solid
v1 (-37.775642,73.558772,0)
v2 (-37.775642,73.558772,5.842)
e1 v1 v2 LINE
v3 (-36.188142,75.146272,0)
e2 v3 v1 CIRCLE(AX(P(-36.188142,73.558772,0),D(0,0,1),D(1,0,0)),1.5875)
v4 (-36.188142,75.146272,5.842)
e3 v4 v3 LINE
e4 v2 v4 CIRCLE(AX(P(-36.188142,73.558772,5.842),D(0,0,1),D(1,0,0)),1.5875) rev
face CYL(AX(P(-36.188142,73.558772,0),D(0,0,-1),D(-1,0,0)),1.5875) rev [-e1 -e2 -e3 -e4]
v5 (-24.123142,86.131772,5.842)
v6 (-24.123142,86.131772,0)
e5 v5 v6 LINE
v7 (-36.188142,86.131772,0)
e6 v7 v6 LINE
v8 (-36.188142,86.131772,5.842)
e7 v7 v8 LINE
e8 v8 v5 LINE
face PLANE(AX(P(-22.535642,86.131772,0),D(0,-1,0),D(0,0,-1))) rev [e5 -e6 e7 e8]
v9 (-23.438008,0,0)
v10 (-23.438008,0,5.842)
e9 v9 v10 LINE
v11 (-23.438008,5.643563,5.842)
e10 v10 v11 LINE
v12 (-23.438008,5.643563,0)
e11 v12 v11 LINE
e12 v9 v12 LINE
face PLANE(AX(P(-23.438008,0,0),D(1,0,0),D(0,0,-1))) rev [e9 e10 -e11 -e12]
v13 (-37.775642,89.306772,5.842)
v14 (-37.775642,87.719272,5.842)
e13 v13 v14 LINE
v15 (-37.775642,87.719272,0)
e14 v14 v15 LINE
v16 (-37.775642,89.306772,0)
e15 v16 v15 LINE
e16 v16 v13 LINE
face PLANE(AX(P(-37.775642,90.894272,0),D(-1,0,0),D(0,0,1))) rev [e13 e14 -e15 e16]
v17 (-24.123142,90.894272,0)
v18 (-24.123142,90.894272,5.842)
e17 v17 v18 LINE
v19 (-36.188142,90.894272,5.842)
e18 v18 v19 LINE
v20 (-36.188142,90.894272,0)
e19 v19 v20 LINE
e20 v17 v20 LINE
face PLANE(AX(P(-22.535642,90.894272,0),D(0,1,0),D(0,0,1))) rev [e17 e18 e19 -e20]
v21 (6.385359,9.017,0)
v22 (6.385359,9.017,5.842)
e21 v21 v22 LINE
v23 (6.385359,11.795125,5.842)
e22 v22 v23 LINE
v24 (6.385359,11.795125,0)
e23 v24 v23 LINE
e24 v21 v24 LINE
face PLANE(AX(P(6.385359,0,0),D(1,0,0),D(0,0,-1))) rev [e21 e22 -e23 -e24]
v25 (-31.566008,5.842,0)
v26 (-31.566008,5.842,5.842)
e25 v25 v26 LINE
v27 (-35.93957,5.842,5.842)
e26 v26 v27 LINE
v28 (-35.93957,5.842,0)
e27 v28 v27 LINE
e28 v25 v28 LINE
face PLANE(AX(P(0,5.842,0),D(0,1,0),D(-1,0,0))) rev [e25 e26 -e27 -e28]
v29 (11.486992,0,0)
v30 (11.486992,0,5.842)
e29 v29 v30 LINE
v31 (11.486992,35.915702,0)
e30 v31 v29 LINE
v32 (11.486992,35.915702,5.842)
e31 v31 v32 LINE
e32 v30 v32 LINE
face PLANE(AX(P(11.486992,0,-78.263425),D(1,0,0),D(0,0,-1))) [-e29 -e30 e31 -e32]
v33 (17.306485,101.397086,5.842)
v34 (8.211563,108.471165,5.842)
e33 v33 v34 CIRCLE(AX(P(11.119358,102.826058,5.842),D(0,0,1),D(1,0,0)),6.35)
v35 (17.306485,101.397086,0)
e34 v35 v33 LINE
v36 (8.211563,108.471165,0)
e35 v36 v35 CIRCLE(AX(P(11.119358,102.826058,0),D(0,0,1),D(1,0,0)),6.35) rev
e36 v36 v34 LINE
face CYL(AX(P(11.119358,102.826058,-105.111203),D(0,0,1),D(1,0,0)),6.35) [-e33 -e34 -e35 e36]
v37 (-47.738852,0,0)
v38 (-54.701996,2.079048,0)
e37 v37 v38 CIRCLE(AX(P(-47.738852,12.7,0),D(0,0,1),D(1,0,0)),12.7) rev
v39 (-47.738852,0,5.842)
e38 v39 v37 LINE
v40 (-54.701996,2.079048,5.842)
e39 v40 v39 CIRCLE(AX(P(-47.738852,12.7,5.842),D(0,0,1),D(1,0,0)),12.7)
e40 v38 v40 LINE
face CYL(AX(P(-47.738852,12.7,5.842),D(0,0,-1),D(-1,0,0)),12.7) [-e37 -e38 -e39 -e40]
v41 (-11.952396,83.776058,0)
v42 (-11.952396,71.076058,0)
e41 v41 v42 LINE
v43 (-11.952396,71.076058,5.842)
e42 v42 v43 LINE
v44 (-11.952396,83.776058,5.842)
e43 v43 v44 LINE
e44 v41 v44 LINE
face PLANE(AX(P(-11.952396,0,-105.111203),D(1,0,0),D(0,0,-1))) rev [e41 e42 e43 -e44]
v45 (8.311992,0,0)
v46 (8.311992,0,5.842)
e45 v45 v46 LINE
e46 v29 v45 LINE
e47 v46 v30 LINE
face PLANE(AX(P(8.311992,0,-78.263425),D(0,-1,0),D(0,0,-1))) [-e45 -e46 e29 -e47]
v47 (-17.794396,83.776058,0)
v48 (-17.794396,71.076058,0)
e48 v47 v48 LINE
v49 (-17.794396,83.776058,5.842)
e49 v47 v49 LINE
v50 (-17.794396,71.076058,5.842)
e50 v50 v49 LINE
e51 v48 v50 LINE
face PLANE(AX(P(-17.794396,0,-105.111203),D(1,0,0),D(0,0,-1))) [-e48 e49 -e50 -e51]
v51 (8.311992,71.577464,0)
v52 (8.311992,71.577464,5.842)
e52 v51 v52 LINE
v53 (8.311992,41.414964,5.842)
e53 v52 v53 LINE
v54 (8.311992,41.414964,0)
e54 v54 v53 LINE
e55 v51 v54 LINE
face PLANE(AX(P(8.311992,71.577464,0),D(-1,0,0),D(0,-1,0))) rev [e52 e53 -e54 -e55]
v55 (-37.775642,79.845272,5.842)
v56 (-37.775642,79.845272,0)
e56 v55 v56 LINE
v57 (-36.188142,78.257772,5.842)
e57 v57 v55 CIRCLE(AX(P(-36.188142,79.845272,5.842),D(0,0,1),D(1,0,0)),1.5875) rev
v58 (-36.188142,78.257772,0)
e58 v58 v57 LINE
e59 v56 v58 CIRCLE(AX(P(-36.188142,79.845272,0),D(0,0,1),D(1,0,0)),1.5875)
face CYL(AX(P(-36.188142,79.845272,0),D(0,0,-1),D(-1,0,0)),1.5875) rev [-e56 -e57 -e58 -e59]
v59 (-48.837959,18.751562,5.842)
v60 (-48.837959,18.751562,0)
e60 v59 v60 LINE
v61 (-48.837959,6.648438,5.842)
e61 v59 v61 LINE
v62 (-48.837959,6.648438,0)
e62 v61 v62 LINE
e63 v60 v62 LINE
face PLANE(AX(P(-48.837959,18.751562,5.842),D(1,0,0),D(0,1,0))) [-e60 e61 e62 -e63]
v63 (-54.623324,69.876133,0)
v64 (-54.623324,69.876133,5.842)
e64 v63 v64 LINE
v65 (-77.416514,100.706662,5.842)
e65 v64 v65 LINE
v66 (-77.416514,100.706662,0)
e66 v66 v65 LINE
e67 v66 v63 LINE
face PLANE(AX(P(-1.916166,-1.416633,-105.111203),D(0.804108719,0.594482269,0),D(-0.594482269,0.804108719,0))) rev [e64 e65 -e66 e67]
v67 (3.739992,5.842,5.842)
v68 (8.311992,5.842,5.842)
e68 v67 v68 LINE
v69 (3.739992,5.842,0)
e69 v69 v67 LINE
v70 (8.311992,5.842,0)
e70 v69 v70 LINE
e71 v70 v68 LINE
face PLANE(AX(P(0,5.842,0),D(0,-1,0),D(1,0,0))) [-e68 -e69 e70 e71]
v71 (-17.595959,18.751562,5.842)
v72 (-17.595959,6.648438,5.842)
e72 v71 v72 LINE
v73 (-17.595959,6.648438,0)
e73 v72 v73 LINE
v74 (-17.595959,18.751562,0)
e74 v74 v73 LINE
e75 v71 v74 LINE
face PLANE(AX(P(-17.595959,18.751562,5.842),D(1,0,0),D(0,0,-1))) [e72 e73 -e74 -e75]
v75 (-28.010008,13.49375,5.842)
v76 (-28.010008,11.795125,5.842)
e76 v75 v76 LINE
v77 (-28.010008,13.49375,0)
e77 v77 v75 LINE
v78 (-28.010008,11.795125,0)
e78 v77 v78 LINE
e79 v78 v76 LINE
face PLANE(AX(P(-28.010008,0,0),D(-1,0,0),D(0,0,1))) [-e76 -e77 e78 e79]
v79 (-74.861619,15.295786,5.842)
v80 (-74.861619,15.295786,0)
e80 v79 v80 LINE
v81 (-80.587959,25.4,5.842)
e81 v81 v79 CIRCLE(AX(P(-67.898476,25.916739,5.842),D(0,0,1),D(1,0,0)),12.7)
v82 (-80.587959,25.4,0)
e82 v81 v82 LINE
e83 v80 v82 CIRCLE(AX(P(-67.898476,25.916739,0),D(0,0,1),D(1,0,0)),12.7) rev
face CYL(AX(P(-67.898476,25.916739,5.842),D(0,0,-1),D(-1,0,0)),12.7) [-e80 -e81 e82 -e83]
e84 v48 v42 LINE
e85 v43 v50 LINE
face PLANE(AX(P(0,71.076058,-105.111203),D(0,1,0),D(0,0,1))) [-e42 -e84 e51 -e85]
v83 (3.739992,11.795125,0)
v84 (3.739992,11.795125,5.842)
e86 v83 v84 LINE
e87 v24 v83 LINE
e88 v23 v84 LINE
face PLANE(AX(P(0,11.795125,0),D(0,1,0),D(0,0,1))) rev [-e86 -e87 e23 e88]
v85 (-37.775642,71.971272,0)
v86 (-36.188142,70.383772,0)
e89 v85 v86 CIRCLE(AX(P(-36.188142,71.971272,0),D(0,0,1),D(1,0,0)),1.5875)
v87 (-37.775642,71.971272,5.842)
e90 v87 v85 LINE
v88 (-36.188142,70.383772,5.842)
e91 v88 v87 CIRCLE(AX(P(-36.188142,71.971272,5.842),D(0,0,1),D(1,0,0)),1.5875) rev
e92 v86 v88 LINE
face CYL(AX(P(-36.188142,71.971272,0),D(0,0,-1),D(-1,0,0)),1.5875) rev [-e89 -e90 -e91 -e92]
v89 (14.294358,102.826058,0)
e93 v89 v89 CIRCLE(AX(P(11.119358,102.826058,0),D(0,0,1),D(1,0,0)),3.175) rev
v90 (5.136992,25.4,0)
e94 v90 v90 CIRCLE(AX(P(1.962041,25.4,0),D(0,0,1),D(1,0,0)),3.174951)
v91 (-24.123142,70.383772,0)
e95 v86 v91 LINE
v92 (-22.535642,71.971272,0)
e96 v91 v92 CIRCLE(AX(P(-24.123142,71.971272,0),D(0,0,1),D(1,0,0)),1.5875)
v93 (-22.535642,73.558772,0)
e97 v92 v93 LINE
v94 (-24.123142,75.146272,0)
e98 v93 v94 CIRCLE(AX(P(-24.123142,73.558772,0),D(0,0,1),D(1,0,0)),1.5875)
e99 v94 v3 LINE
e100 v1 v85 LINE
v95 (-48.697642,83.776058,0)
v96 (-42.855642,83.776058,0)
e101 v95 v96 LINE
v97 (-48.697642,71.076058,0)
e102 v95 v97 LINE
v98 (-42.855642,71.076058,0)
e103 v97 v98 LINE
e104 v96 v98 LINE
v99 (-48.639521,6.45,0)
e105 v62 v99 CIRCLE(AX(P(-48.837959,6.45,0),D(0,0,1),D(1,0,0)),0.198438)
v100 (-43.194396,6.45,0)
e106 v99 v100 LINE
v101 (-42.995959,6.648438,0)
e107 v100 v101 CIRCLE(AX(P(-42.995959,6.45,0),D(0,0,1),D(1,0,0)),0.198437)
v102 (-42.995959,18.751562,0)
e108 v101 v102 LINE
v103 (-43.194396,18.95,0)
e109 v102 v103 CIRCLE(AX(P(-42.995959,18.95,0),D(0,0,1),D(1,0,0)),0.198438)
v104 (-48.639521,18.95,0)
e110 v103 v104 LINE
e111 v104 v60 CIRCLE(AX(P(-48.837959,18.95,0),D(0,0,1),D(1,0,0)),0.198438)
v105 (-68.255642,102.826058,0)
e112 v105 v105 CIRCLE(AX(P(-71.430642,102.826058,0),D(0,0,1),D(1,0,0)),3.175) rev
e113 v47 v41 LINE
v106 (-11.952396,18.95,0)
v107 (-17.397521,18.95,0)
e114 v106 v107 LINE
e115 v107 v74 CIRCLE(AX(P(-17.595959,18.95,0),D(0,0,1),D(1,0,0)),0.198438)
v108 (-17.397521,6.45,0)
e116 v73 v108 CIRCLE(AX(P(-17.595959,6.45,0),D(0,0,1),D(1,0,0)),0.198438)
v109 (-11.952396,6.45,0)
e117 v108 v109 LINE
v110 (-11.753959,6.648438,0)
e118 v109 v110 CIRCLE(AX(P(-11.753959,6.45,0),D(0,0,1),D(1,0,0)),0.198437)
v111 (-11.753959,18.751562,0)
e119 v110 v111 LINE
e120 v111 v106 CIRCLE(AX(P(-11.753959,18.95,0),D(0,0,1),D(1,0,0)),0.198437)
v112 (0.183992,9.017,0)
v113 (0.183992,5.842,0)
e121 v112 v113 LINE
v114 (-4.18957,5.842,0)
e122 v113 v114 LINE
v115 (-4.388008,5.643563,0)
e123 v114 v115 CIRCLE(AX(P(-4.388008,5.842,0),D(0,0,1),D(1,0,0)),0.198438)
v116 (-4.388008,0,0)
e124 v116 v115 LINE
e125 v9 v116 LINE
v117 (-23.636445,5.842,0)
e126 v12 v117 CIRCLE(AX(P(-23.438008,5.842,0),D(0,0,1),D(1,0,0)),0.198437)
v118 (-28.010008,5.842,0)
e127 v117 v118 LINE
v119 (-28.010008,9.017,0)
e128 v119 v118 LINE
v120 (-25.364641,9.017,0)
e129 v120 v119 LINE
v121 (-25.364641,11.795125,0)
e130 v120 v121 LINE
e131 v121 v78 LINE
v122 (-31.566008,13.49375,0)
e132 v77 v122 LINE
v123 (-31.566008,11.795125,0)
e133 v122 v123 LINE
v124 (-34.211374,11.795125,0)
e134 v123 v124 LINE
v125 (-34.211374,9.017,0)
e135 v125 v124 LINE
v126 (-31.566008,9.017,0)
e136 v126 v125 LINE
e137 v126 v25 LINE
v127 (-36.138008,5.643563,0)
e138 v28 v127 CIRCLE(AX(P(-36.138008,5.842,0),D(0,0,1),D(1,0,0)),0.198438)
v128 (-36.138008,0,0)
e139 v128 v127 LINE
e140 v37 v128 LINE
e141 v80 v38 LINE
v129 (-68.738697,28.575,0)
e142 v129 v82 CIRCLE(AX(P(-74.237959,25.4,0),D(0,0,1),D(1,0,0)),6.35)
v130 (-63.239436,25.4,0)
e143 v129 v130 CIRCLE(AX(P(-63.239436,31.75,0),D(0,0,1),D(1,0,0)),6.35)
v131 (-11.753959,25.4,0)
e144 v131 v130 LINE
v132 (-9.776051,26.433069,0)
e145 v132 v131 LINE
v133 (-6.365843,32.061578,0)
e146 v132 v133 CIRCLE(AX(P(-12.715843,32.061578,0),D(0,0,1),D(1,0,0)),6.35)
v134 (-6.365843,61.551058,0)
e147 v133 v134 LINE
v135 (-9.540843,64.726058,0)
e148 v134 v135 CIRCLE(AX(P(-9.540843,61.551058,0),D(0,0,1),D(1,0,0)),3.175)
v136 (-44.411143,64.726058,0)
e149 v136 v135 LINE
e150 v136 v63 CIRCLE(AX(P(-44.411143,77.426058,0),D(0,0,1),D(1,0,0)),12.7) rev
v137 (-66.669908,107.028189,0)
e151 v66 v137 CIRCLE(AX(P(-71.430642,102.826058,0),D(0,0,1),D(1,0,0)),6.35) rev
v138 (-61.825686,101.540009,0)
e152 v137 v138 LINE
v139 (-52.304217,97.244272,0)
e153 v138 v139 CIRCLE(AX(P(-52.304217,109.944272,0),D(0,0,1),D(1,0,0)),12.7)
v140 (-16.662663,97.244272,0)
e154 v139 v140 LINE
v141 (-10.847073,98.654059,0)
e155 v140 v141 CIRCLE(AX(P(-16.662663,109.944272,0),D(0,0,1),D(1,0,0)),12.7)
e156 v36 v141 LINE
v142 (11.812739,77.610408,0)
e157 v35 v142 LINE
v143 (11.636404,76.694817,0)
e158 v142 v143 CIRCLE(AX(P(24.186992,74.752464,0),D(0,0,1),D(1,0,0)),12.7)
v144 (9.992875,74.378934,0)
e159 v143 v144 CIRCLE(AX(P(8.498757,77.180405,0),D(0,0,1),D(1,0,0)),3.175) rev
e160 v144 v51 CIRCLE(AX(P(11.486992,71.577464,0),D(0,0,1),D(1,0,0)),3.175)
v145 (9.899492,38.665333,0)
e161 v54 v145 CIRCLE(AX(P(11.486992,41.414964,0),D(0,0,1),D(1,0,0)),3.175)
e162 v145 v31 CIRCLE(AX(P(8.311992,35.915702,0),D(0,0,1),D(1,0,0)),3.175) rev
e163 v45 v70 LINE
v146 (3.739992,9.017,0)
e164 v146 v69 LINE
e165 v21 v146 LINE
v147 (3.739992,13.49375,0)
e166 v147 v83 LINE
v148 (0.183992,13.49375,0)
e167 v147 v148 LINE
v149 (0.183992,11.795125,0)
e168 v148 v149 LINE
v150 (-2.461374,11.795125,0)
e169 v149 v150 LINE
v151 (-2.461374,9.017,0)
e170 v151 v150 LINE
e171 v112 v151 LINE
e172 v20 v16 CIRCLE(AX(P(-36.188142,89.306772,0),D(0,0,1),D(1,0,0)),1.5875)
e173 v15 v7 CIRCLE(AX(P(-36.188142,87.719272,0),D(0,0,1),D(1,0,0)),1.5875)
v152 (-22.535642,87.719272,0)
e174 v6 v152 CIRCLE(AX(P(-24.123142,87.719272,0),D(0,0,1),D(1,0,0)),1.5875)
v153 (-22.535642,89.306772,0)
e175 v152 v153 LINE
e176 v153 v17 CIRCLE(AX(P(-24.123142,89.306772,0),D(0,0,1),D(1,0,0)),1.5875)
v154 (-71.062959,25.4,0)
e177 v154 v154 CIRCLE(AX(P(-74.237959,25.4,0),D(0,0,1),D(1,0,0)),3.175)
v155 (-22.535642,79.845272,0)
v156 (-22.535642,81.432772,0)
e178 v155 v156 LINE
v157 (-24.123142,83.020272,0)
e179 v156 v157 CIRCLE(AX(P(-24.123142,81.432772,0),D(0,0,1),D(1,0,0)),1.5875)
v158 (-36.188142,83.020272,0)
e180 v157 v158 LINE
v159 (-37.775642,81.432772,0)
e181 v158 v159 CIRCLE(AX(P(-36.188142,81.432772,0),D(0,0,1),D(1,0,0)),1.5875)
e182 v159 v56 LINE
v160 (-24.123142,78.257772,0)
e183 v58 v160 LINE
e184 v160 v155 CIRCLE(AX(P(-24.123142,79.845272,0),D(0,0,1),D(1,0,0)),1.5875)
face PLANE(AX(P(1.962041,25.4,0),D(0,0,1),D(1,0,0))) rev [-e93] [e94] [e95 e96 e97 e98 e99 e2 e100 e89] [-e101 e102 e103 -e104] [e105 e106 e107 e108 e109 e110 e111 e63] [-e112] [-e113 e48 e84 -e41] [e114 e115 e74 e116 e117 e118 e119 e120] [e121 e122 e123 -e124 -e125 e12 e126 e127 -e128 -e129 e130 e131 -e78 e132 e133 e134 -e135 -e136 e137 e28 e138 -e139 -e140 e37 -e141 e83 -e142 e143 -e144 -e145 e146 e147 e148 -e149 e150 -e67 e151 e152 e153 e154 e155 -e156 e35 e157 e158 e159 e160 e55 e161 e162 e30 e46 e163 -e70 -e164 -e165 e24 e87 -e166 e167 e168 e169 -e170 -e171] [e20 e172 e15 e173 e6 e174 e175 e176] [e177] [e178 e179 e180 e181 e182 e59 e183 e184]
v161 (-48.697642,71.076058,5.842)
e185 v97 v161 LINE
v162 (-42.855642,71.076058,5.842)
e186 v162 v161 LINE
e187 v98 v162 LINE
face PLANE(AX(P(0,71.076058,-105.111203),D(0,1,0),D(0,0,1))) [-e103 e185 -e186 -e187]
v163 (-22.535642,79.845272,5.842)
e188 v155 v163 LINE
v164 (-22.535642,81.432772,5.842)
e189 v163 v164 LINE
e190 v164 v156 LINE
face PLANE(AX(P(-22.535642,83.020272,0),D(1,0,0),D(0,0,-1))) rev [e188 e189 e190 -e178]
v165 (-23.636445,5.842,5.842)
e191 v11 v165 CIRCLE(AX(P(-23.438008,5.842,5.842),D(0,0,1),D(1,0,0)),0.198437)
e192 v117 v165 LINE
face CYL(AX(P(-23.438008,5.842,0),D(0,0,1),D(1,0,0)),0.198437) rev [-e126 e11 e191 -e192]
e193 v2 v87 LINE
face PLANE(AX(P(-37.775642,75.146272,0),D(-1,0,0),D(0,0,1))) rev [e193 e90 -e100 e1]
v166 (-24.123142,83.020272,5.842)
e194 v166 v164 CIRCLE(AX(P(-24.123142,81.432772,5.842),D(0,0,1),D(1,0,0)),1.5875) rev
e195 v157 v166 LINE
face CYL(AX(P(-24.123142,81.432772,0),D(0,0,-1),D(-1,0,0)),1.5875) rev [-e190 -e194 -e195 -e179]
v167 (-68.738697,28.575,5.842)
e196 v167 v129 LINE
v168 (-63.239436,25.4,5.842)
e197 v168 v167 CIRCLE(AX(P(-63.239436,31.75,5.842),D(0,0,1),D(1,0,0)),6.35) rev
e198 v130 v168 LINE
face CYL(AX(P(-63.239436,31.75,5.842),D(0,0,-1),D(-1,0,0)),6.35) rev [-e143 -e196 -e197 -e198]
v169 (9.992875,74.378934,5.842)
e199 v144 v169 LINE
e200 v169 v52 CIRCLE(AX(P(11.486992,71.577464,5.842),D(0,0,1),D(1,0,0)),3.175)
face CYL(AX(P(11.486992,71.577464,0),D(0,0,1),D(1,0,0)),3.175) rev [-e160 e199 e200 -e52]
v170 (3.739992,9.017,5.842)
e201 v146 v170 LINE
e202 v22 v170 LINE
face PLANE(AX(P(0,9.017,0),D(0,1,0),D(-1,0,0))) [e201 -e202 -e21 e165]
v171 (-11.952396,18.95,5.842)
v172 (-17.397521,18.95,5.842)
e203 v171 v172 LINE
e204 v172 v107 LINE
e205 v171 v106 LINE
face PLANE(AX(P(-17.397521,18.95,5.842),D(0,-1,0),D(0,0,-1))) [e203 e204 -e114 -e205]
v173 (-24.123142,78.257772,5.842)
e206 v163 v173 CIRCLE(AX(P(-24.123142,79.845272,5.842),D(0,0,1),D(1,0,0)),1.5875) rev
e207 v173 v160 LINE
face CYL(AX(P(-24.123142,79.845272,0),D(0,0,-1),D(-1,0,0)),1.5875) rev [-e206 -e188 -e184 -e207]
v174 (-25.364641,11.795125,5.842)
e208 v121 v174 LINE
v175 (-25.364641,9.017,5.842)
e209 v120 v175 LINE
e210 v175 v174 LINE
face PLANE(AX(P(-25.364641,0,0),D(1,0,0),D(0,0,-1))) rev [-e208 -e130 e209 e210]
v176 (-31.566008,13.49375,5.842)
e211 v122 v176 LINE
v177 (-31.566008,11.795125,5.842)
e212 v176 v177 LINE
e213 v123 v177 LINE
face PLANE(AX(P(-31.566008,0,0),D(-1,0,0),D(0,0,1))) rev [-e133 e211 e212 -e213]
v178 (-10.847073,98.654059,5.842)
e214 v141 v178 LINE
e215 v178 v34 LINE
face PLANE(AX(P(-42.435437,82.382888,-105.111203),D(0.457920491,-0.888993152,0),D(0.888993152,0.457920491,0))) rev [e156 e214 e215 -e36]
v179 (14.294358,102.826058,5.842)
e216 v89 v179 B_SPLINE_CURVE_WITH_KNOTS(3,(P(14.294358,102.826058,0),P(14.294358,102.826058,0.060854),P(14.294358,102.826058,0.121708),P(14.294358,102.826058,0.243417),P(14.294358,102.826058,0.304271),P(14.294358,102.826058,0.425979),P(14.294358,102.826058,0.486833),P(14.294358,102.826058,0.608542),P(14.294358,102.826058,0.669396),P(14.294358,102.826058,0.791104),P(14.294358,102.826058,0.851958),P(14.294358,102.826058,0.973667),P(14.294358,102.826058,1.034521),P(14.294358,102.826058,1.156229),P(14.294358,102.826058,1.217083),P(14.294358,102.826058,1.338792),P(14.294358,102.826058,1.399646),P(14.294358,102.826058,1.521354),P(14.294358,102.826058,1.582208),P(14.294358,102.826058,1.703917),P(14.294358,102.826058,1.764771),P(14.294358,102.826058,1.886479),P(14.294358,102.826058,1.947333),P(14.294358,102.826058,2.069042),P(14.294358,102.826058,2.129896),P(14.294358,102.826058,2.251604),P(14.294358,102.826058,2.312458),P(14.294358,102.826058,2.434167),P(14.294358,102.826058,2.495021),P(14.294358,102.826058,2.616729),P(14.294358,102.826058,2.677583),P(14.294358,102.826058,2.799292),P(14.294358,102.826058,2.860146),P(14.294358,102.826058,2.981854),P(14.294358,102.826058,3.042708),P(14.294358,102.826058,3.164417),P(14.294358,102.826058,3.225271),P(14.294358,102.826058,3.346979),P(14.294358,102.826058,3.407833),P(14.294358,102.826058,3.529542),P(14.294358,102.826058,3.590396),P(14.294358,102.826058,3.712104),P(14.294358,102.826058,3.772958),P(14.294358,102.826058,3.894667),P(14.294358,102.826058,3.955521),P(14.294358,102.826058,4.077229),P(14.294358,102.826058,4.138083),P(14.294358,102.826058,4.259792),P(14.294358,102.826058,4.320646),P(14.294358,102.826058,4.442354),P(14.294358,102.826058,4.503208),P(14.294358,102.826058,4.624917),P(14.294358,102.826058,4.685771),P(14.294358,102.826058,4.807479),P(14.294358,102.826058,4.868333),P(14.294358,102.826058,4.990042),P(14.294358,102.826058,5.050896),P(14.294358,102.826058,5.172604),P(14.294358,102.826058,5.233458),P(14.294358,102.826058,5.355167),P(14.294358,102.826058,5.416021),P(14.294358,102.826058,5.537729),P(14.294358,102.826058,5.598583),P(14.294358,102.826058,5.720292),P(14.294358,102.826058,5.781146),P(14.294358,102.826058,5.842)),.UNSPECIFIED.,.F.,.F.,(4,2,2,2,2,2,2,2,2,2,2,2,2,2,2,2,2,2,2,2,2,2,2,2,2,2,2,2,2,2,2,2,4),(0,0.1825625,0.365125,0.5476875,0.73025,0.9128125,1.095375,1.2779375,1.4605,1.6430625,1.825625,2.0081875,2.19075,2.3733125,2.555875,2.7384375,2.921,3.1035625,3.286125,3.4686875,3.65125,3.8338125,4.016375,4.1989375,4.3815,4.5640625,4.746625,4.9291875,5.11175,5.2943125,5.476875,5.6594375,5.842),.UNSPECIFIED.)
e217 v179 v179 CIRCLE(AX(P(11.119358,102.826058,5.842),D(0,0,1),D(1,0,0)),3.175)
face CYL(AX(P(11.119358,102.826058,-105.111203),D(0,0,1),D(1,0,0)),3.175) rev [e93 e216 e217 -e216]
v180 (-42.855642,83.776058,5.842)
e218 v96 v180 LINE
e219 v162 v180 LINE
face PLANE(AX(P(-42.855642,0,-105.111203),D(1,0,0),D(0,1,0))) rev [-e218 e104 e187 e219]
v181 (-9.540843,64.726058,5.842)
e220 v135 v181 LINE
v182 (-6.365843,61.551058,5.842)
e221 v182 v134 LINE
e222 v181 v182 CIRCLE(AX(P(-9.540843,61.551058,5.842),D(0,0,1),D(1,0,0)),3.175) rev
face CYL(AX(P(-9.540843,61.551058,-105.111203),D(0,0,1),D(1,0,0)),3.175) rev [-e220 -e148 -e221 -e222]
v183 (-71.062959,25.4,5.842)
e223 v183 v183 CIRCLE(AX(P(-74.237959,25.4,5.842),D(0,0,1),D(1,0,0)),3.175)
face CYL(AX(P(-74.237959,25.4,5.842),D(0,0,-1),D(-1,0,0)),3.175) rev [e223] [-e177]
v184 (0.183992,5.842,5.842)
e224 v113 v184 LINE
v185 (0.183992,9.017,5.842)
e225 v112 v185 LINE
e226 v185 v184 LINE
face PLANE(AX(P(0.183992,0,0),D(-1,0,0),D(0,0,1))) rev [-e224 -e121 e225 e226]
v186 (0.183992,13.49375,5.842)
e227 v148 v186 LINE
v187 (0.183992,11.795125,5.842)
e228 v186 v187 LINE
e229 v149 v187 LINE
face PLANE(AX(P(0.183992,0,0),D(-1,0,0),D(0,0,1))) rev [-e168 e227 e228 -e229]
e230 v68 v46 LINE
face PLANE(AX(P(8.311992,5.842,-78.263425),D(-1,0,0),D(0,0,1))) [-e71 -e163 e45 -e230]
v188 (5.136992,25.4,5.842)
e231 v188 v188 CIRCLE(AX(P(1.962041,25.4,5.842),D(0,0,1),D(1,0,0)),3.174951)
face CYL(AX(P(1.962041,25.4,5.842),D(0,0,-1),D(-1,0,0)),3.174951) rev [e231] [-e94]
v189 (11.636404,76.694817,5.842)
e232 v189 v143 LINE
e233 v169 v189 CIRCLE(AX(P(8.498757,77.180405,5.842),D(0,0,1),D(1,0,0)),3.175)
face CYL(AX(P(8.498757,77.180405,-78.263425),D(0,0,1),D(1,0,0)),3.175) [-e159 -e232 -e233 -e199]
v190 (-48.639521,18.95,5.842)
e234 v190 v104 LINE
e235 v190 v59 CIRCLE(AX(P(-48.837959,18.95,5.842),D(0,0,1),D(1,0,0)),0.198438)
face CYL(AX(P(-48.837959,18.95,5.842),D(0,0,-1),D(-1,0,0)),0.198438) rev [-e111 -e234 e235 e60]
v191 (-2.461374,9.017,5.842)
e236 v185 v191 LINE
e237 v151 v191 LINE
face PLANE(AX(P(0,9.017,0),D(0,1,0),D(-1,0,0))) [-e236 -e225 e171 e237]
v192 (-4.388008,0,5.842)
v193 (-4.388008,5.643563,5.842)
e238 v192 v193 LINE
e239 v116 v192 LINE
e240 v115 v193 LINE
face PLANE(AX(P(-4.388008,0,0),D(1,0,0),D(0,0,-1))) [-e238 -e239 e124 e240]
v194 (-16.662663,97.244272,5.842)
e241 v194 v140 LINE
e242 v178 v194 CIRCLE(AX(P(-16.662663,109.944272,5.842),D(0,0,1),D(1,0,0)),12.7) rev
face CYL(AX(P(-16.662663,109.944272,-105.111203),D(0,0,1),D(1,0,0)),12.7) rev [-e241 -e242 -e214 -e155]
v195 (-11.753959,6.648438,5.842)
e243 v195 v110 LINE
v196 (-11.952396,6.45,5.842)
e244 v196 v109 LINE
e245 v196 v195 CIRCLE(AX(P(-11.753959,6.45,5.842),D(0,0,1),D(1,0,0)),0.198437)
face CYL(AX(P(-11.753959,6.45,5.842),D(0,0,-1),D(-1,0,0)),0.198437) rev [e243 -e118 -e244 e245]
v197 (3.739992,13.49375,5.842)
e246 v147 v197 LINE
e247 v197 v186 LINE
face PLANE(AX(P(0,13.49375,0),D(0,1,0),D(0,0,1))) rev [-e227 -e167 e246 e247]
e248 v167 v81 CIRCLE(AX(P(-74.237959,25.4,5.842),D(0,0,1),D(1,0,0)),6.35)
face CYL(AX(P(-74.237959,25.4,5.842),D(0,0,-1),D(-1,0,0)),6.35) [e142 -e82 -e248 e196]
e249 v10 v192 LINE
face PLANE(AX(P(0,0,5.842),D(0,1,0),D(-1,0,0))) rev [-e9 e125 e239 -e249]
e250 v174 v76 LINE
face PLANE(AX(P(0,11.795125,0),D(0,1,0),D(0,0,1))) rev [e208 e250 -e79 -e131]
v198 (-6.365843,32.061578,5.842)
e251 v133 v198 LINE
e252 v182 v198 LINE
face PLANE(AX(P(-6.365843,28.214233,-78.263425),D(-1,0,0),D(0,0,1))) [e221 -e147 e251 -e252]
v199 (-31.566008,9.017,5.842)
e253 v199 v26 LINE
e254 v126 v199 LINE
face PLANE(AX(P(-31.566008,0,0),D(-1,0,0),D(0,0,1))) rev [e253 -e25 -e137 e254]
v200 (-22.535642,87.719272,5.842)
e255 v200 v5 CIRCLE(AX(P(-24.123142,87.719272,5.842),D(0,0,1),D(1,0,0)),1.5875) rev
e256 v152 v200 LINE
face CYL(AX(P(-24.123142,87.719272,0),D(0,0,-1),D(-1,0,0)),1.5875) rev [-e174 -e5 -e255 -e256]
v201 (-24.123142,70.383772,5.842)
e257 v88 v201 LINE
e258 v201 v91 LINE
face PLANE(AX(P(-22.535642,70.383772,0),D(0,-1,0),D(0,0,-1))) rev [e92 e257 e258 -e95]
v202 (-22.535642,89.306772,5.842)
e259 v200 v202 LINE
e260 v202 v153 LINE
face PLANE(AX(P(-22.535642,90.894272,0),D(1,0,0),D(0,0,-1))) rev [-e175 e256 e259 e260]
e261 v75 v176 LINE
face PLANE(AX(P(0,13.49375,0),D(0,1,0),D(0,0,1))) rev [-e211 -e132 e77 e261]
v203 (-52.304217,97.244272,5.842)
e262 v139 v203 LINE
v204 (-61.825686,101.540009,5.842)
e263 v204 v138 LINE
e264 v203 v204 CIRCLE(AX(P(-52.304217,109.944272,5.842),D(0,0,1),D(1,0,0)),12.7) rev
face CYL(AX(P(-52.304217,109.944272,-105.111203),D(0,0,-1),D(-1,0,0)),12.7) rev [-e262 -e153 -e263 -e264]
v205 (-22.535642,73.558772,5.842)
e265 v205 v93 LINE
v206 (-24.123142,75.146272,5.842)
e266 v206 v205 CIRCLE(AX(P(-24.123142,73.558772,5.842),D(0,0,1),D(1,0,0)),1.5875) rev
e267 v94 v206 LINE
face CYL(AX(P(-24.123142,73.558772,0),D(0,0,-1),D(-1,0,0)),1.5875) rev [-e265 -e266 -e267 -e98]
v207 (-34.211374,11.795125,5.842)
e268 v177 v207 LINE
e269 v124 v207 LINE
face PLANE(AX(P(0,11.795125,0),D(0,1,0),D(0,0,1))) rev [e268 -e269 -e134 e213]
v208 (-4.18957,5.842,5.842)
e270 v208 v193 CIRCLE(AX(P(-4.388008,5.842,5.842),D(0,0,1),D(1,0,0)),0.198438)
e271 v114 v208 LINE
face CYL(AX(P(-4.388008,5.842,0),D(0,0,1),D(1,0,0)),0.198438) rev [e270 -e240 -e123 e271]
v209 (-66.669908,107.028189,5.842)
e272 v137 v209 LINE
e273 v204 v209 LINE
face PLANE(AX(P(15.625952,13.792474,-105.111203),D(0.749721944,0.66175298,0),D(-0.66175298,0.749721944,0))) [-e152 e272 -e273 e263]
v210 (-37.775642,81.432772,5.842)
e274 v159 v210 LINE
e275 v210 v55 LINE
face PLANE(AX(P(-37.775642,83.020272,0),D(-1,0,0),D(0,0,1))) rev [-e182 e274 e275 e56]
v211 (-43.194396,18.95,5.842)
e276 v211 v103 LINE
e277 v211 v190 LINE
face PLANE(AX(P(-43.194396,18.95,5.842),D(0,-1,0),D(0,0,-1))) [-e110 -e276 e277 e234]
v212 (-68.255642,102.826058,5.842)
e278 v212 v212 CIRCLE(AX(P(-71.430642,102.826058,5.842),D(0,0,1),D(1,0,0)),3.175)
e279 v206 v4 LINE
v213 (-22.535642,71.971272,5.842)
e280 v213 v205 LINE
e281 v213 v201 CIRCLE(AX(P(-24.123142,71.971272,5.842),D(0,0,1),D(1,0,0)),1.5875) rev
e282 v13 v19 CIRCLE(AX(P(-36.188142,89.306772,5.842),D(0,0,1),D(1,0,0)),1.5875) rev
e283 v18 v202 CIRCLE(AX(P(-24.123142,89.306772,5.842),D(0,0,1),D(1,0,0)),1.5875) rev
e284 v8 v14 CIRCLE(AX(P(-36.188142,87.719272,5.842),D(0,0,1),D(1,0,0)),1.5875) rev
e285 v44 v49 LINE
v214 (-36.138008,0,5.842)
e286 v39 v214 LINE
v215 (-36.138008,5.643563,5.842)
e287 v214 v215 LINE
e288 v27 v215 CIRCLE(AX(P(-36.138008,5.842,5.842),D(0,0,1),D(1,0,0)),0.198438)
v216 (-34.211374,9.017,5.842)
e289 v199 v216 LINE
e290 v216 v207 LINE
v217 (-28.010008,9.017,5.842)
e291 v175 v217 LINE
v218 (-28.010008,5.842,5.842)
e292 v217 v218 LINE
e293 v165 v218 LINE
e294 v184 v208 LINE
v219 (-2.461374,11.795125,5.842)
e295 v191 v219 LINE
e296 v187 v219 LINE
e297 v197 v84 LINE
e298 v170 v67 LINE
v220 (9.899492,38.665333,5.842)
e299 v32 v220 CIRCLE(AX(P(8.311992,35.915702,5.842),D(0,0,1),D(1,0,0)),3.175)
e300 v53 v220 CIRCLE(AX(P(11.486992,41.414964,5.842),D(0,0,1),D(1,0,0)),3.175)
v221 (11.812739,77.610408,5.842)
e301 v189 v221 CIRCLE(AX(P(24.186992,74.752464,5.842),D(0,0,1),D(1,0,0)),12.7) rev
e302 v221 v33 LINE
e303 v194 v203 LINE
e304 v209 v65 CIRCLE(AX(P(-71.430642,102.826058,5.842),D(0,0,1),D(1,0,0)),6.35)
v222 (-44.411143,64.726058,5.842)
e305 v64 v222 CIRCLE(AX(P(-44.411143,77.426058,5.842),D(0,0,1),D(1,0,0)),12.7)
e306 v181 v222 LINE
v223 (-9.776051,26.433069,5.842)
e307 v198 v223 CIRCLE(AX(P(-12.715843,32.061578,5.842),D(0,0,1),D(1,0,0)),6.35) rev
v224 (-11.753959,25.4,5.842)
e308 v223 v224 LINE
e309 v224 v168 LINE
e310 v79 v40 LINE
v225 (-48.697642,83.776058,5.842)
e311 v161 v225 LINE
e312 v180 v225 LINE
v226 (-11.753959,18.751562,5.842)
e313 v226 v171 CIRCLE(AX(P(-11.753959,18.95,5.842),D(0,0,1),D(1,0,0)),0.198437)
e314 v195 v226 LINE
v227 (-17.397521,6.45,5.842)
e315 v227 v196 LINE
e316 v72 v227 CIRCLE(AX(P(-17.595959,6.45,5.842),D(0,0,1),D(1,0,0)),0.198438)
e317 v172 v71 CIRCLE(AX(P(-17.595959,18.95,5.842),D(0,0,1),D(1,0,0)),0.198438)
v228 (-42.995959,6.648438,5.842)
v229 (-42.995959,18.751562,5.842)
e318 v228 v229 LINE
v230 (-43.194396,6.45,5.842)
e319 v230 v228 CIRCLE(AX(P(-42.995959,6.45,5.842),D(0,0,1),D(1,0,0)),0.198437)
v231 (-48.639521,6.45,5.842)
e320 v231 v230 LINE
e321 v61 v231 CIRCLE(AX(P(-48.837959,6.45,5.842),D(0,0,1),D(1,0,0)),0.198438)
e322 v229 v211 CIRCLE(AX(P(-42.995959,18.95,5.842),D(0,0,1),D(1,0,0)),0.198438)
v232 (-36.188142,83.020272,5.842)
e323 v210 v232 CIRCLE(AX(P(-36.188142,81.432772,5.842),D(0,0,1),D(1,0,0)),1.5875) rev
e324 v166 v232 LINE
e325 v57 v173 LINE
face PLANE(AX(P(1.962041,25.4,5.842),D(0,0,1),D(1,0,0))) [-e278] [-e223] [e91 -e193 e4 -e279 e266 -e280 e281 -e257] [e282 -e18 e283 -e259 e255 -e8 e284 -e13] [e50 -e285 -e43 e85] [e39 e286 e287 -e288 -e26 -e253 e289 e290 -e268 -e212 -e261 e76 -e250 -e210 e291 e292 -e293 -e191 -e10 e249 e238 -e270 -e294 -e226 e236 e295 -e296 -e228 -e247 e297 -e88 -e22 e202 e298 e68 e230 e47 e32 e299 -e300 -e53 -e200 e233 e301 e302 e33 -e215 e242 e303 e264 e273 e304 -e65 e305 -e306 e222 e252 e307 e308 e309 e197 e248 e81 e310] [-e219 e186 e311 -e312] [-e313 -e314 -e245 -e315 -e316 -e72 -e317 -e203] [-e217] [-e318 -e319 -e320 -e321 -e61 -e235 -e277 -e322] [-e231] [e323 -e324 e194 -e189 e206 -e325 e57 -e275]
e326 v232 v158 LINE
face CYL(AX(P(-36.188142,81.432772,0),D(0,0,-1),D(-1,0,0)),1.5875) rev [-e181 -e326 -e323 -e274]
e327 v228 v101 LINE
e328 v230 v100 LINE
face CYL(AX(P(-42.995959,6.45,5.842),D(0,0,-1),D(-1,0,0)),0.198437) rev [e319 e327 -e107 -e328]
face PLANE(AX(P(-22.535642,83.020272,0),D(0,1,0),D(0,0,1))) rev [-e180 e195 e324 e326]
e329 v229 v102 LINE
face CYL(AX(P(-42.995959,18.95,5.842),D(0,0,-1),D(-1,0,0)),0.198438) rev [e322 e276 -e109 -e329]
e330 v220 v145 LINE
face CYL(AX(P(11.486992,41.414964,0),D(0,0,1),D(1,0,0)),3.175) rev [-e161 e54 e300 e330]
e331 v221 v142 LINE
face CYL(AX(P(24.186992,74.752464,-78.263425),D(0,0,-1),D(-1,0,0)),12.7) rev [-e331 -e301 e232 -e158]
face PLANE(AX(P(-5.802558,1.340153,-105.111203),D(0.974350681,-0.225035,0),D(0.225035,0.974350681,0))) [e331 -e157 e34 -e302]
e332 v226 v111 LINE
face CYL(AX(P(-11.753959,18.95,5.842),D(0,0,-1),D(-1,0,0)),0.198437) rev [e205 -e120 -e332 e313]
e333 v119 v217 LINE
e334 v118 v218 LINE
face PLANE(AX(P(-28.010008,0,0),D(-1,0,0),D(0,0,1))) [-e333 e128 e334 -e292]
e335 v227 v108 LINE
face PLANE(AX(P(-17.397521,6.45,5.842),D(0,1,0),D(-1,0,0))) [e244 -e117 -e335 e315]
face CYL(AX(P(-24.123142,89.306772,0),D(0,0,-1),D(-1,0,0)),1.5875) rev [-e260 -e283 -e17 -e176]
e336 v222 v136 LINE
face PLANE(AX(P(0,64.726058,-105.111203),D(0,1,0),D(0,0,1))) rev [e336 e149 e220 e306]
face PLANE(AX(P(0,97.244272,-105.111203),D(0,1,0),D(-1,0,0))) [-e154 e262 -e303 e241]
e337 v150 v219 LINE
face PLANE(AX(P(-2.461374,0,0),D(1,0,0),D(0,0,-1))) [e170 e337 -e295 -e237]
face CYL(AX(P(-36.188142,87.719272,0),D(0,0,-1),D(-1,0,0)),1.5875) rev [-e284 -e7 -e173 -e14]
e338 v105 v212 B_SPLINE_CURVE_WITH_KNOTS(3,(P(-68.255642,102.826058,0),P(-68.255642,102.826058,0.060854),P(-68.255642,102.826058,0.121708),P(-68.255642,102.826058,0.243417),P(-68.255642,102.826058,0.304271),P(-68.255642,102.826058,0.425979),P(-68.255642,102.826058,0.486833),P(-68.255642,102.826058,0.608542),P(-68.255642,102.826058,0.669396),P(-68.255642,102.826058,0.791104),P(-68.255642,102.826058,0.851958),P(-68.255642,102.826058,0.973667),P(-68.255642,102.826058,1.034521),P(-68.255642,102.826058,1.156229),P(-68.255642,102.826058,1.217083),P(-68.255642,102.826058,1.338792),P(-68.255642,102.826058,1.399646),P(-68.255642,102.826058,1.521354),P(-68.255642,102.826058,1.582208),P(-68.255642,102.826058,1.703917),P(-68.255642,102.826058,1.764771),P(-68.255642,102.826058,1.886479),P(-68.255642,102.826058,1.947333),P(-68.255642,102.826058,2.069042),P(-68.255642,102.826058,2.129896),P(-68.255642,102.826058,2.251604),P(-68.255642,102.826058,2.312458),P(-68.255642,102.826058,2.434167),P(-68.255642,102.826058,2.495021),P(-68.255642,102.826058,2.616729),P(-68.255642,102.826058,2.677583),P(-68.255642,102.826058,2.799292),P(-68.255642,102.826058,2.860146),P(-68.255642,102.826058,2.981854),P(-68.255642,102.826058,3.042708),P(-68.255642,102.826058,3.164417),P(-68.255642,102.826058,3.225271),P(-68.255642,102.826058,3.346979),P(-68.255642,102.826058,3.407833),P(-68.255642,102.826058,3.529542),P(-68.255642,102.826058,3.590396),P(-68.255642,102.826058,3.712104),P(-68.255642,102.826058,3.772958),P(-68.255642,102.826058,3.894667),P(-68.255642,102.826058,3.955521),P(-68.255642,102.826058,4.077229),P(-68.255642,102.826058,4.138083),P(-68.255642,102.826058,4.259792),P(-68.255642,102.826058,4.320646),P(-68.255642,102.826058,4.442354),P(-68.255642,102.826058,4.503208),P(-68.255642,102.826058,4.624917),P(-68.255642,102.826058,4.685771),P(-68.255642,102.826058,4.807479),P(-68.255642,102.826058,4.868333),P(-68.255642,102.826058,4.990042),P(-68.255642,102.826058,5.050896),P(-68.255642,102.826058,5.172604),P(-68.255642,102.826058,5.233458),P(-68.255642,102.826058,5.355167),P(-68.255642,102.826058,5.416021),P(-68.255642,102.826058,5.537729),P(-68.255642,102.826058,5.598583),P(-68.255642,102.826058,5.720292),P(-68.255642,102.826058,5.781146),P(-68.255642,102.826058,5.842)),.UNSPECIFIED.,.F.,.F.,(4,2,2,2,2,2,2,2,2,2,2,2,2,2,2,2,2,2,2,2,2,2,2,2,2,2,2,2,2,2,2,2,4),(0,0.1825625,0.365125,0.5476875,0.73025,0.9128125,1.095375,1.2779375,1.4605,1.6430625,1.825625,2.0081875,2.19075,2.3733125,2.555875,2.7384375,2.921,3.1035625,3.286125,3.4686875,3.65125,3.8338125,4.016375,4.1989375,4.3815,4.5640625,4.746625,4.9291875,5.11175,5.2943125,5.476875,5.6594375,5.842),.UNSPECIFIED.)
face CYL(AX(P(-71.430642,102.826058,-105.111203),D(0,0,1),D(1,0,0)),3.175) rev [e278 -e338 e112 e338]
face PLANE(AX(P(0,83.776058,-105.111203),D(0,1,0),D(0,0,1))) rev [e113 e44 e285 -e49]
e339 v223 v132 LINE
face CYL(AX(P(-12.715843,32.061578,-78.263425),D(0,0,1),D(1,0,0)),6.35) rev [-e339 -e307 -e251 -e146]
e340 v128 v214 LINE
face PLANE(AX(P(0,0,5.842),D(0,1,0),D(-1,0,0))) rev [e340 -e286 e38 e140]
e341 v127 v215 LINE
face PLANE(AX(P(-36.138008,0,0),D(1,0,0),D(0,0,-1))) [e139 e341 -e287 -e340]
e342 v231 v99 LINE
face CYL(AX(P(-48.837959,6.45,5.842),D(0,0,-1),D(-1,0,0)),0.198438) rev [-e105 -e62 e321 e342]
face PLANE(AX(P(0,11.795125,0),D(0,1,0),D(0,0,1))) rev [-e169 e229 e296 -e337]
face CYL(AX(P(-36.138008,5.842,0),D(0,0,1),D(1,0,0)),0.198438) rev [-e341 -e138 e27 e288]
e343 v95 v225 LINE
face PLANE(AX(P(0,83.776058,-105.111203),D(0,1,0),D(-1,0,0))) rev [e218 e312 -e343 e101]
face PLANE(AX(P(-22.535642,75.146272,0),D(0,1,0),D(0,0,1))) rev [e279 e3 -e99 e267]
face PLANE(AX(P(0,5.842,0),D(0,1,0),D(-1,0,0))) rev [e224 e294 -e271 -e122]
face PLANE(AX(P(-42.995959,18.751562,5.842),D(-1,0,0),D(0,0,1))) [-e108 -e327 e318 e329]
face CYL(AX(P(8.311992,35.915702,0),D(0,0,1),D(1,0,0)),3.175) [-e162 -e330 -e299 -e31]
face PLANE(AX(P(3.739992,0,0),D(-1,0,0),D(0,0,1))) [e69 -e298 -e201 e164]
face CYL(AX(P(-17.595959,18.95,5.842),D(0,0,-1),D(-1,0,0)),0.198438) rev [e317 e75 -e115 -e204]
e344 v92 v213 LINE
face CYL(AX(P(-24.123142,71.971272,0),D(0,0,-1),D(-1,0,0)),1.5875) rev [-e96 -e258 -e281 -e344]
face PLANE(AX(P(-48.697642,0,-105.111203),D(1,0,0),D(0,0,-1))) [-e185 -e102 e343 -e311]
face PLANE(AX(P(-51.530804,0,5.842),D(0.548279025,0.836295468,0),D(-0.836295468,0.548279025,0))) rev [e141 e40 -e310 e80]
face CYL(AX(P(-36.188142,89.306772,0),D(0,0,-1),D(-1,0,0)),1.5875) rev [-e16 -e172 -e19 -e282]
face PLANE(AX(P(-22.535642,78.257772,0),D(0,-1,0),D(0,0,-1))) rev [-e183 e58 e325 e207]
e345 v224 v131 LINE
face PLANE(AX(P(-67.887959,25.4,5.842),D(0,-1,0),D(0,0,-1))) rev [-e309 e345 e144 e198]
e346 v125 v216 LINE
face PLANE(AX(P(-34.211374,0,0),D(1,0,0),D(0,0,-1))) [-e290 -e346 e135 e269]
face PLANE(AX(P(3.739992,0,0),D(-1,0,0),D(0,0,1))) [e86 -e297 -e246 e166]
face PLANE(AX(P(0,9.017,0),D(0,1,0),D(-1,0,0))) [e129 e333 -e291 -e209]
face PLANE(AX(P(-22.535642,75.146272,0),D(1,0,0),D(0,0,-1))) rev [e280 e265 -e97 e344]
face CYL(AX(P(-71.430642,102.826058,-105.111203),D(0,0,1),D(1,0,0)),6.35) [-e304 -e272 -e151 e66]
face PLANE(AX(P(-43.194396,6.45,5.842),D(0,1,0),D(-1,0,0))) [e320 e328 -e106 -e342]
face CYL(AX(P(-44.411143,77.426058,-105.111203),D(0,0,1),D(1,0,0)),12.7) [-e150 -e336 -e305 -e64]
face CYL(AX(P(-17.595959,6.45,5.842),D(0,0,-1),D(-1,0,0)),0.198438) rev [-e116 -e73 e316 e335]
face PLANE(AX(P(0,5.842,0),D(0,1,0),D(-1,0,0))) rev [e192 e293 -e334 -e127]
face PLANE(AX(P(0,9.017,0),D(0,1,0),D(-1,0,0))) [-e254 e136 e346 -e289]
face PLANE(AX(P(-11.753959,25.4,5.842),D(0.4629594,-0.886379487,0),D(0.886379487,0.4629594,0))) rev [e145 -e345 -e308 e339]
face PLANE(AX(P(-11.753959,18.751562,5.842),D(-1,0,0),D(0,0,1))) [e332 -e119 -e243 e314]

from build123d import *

# Parameters (mm, degrees)
SKETCH1_R           = 3.175
SKETCH1_R_2         = 3.174951128
BOSS_EXTRUDE1_DEPTH = 5.842
FILLET2_R           = 12.7
FILLET3_R           = 6.35
CUT_EXTRUDE1_DEPTH  = 87.813654174
BOSS_EXTRUDE2_START = -5.842
BOSS_EXTRUDE2_DEPTH = 5.842
FILLET4_R           = 6.35
SKETCH5_W           = 5.842
SKETCH5_H           = 12.7
SKETCH5_R           = 3.175
BOSS_EXTRUDE3_DEPTH = 5.842
FILLET5_R           = 3.175
FILLET6_R           = 12.7
CUT_EXTRUDE3_DEPTH  = 136.823266385
FILLET7_R           = 3.175
SKETCH8_W           = 15.24
SKETCH8_H           = 4.7625
CUT_EXTRUDE4_DEPTH  = 136.823266529
FILLET8_R           = 1.5875


with BuildPart() as part:
    # Sketch1 → Boss-Extrude1 (new body)
    with BuildSketch(Plane.XY):
        with BuildLine():
            Line((0, 0), (-51.530803591, 0))
            Line((-51.530803591, 0), (-80.587958697, 19.05))
            Line((-80.587958697, 19.05), (-80.587958697, 25.4))
            ThreePointArc((-80.587958697, 25.4), (-74.237958697, 31.75), (-67.887958697, 25.4))
            Line((-67.887958697, 25.4), (-63.5, 25.4))
            Line((-63.5, 25.4), (-11.753958697, 25.4))
            Line((-11.753958697, 25.4), (-0.97772826, 31.02846642))
            ThreePointArc((-0.97772826, 31.02846642), (5.252518949, 30.830896444), (8.311992431, 25.4))
            Line((8.311992431, 25.4), (8.311992431, 0))
            Line((8.311992431, 0), (1.962041303, 0))
            Line((1.962041303, 0), (0, 0))
        make_face()
        with Locations((-74.237958697, 25.4)):
            Circle(SKETCH1_R, mode=Mode.SUBTRACT)
        with Locations((1.962041303, 25.4)):
            Circle(SKETCH1_R_2, mode=Mode.SUBTRACT)
        with BuildLine():
            Line((-17.397521197, 18.95), (-11.952396197, 18.95))
            ThreePointArc((-11.952396197, 18.95), (-11.613642195, 19.090316502), (-11.753958697, 18.7515625))
            Line((-11.753958697, 18.7515625), (-11.753958697, 6.6484375))
            ThreePointArc((-11.753958697, 6.6484375), (-11.613642195, 6.309683498), (-11.952396197, 6.45))
            Line((-11.952396197, 6.45), (-17.397521197, 6.45))
            ThreePointArc((-17.397521197, 6.45), (-17.736275199, 6.309683498), (-17.595958697, 6.6484375))
            Line((-17.595958697, 6.6484375), (-17.595958697, 18.7515625))
            ThreePointArc((-17.595958697, 18.7515625), (-17.736275199, 19.090316502), (-17.397521197, 18.95))
        make_face(mode=Mode.SUBTRACT)
        with BuildLine():
            Line((-43.194396197, 18.95), (-48.639521197, 18.95))
            ThreePointArc((-48.639521197, 18.95), (-48.978275199, 19.090316502), (-48.837958697, 18.7515625))
            Line((-48.837958697, 18.7515625), (-48.837958697, 6.6484375))
            ThreePointArc((-48.837958697, 6.6484375), (-48.978275199, 6.309683498), (-48.639521197, 6.45))
            Line((-48.639521197, 6.45), (-43.194396197, 6.45))
            ThreePointArc((-43.194396197, 6.45), (-42.855642195, 6.309683498), (-42.995958697, 6.6484375))
            Line((-42.995958697, 6.6484375), (-42.995958697, 18.7515625))
            ThreePointArc((-42.995958697, 18.7515625), (-42.855642195, 19.090316502), (-43.194396197, 18.95))
        make_face(mode=Mode.SUBTRACT)
    extrude(amount=BOSS_EXTRUDE1_DEPTH)

    # Fillet2
    # the kernel refuses this fillet: 12.7 mm, written as the material it takes off along each edge
    with BuildSketch(Plane(origin=(-51.530803591, 0, -9.479879108), x_dir=(1, 0, 0), z_dir=(0, 0, 1))) as fillet2_piece_1:
        with BuildLine():
            CenterArc((FILLET2_R * 0.298578869541, FILLET2_R), FILLET2_R, 236.750973169, 33.249026831)
            Line((-FILLET2_R * 0.249700155583, FILLET2_R * 0.163704531514), (0, 0))
            Line((0, 0), (FILLET2_R * 0.298578869541, 0))
        make_face()
    extrude(amount=24.801758216, mode=Mode.SUBTRACT)
    with BuildSketch(Plane(origin=(-80.587958697, 19.05, -17.118170795), x_dir=(0, 1, 0), z_dir=(0, 0, 1))) as fillet2_piece_2:
        with BuildLine():
            CenterArc((6.866738852, -12.689483085), FILLET2_R, 92.331900044, 54.419073124)
            Line((-3.754213598, -5.726339466), (0, 0))
            Line((0, 0), (6.35, 0))
        make_face()
    extrude(amount=40.078341589, mode=Mode.SUBTRACT)

    # Fillet3
    fillet3_edges = [part.edges().sort_by_distance(p)[0] for p in [
        (-67.887958697, 25.4, 2.921),
    ]]
    fillet(fillet3_edges, radius=FILLET3_R)

    # Sketch2 → Cut-Extrude1 (cut, through all)
    with BuildSketch(Plane.XY.offset(5.842)):
        with BuildLine():
            Line((-4.388007569, 5.6435625), (-4.388007569, 0))
            Line((-4.388007569, 0), (8.311992431, 0))
            Line((8.311992431, 0), (8.311992431, 5.6435625))
            Line((8.311992431, 5.6435625), (8.311992431, 5.842))
            Line((8.311992431, 5.842), (8.113554931, 5.842))
            Line((8.113554931, 5.842), (3.739992431, 5.842))
            Line((3.739992431, 5.842), (3.739992431, 9.017))
            Line((3.739992431, 9.017), (6.385358807, 9.017))
            Line((6.385358807, 9.017), (6.385358807, 11.795125))
            Line((6.385358807, 11.795125), (3.739992431, 11.795125))
            Line((3.739992431, 11.795125), (3.739992431, 13.49375))
            Line((3.739992431, 13.49375), (0.183992431, 13.49375))
            Line((0.183992431, 13.49375), (0.183992431, 11.795125))
            Line((0.183992431, 11.795125), (-2.461373945, 11.795125))
            Line((-2.461373945, 11.795125), (-2.461373945, 9.017))
            Line((-2.461373945, 9.017), (0.183992431, 9.017))
            Line((0.183992431, 9.017), (0.183992431, 5.842))
            Line((0.183992431, 5.842), (-4.189570069, 5.842))
            ThreePointArc((-4.189570069, 5.842), (-4.528324071, 5.982316502), (-4.388007569, 5.6435625))
        make_face()
        with BuildLine():
            Line((-36.138007569, 0), (-23.438007569, 0))
            Line((-23.438007569, 0), (-23.438007569, 5.6435625))
            ThreePointArc((-23.438007569, 5.6435625), (-23.297691068, 5.982316502), (-23.636445069, 5.842))
            Line((-23.636445069, 5.842), (-28.010007569, 5.842))
            Line((-28.010007569, 5.842), (-28.010007569, 9.017))
            Line((-28.010007569, 9.017), (-25.364641193, 9.017))
            Line((-25.364641193, 9.017), (-25.364641193, 11.795125))
            Line((-25.364641193, 11.795125), (-28.010007569, 11.795125))
            Line((-28.010007569, 11.795125), (-28.010007569, 13.49375))
            Line((-28.010007569, 13.49375), (-31.566007569, 13.49375))
            Line((-31.566007569, 13.49375), (-31.566007569, 11.795125))
            Line((-31.566007569, 11.795125), (-34.211373945, 11.795125))
            Line((-34.211373945, 11.795125), (-34.211373945, 9.017))
            Line((-34.211373945, 9.017), (-31.566007569, 9.017))
            Line((-31.566007569, 9.017), (-31.566007569, 5.842))
            Line((-31.566007569, 5.842), (-35.939570069, 5.842))
            ThreePointArc((-35.939570069, 5.842), (-36.278324071, 5.982316502), (-36.138007569, 5.6435625))
            Line((-36.138007569, 5.6435625), (-36.138007569, 0))
        make_face()
    extrude(amount=-CUT_EXTRUDE1_DEPTH, mode=Mode.SUBTRACT)

    # Sketch4 → Boss-Extrude2 (add)
    with BuildSketch(Plane.XY.offset(5.842).offset(BOSS_EXTRUDE2_START)):
        with BuildLine():
            Line((-0.97772826, 31.02846642), (-6.365843478, 28.21423321))
            Line((-6.365843478, 28.21423321), (-6.365843478, 76.2))
            Line((-6.365843478, 76.2), (11.486992431, 76.2))
            Line((11.486992431, 76.2), (11.486992431, 0))
            Line((11.486992431, 0), (8.311992431, 0))
            Line((8.311992431, 0), (8.311992431, 5.842))
            Line((8.311992431, 5.842), (8.311992431, 25.4))
            ThreePointArc((8.311992431, 25.4), (5.252518949, 30.830896444), (-0.97772826, 31.02846642))
        make_face()
    extrude(amount=BOSS_EXTRUDE2_DEPTH)

    # Fillet4
    fillet4_edges = [part.edges().sort_by_distance(p)[0] for p in [
        (-6.365843478, 28.21423321, 2.921),
    ]]
    fillet(fillet4_edges, radius=FILLET4_R)

    # Sketch5 → Boss-Extrude3 (add)
    with BuildSketch(Plane.XY.offset(5.842)):
        with BuildLine():
            Line((-50.815843478, 64.726058), (-6.365843478, 64.726058))
            Line((-6.365843478, 64.726058), (-6.365843478, 76.2))
            Line((-6.365843478, 76.2), (11.486992431, 76.2))
            Line((11.486992431, 76.2), (17.306484627, 101.397085752))
            ThreePointArc((17.306484627, 101.397085752), (15.017966748, 107.838377654), (8.211562687, 108.471164514))
            Line((8.211562687, 108.471164514), (-13.583990818, 97.244271998))
            Line((-13.583990818, 97.244271998), (-58.033990818, 97.244271998))
            Line((-58.033990818, 97.244271998), (-66.669907848, 107.028189421))
            ThreePointArc((-66.669907848, 107.028189421), (-74.65021795, 108.299341472), (-77.416513897, 100.706661867))
            Line((-77.416513897, 100.706661867), (-50.815843478, 64.726058))
        make_face()
        with Locations((-45.776642195, 77.426058)):
            Rectangle(SKETCH5_W, SKETCH5_H, mode=Mode.SUBTRACT)
        with Locations((-71.430642195, 102.826058)):
            Circle(SKETCH5_R, mode=Mode.SUBTRACT)
        with Locations((-14.873396197, 77.426058)):
            Rectangle(SKETCH5_W, SKETCH5_H, mode=Mode.SUBTRACT)
        with Locations((11.119357805, 102.826058)):
            Circle(SKETCH5_R, mode=Mode.SUBTRACT)
    extrude(amount=-BOSS_EXTRUDE3_DEPTH)

    # Fillet5
    fillet5_edges = [part.edges().sort_by_distance(p)[0] for p in [
        (-6.365843478, 64.726058, 2.921),
    ]]
    fillet(fillet5_edges, radius=FILLET5_R)

    # Fillet6
    fillet6_edges = [part.edges().sort_by_distance(p)[0] for p in [
        (11.486992431, 76.2, 2.921),
        (-50.815843478, 64.726058, 2.921),
        (-58.033990818, 97.244271998, 2.921),
        (-13.583990818, 97.244271998, 2.921),
    ]]
    fillet(fillet6_edges, radius=FILLET6_R)

    # Sketch7 → Cut-Extrude3 (cut, through all)
    with BuildSketch(Plane.XY.offset(5.842)):
        with BuildLine():
            Line((8.311992431, 71.577463591), (8.311992431, 41.414963591))
            ThreePointArc((8.311992431, 41.414963591), (9.2419284, 39.16989956), (11.486992431, 38.239963591))
            Line((11.486992431, 38.239963591), (11.486992431, 74.752463591))
            ThreePointArc((11.486992431, 74.752463591), (9.2419284, 73.822527621), (8.311992431, 71.577463591))
        make_face()
    extrude(amount=-CUT_EXTRUDE3_DEPTH, mode=Mode.SUBTRACT)

    # Fillet7
    fillet7_edges = [part.edges().sort_by_distance(p)[0] for p in [
        (11.486992431, 74.752463591, 2.921),
        (11.486992431, 38.239963591, 2.921),
    ]]
    fillet(fillet7_edges, radius=FILLET7_R)

    # Sketch8 → Cut-Extrude4 (cut, through all)
    with BuildSketch(Plane.XY.offset(5.842)):
        with Locations((-30.155642195, 80.639021998)):
            Rectangle(SKETCH8_W, SKETCH8_H)
        with Locations((-30.155642195, 88.513021998)):
            Rectangle(SKETCH8_W, SKETCH8_H)
        with Locations((-30.155642195, 72.765021998)):
            Rectangle(SKETCH8_W, SKETCH8_H)
    extrude(amount=-CUT_EXTRUDE4_DEPTH, mode=Mode.SUBTRACT)

    # Fillet8
    fillet8_edges = [part.edges().sort_by_distance(p)[0] for p in [
        (-37.775642195, 86.131771998, 2.921),
        (-37.775642195, 90.894271998, 2.921),
        (-22.535642195, 90.894271998, 2.921),
        (-22.535642195, 86.131771998, 2.921),
        (-22.535642195, 78.257771998, 2.921),
        (-37.775642195, 78.257771998, 2.921),
        (-37.775642195, 83.020271998, 2.921),
        (-22.535642195, 83.020271998, 2.921),
        (-22.535642195, 70.383771998, 2.921),
        (-37.775642195, 70.383771998, 2.921),
        (-37.775642195, 75.146271998, 2.921),
        (-22.535642195, 75.146271998, 2.921),
    ]]
    fillet(fillet8_edges, radius=FILLET8_R)


solid = part.part
